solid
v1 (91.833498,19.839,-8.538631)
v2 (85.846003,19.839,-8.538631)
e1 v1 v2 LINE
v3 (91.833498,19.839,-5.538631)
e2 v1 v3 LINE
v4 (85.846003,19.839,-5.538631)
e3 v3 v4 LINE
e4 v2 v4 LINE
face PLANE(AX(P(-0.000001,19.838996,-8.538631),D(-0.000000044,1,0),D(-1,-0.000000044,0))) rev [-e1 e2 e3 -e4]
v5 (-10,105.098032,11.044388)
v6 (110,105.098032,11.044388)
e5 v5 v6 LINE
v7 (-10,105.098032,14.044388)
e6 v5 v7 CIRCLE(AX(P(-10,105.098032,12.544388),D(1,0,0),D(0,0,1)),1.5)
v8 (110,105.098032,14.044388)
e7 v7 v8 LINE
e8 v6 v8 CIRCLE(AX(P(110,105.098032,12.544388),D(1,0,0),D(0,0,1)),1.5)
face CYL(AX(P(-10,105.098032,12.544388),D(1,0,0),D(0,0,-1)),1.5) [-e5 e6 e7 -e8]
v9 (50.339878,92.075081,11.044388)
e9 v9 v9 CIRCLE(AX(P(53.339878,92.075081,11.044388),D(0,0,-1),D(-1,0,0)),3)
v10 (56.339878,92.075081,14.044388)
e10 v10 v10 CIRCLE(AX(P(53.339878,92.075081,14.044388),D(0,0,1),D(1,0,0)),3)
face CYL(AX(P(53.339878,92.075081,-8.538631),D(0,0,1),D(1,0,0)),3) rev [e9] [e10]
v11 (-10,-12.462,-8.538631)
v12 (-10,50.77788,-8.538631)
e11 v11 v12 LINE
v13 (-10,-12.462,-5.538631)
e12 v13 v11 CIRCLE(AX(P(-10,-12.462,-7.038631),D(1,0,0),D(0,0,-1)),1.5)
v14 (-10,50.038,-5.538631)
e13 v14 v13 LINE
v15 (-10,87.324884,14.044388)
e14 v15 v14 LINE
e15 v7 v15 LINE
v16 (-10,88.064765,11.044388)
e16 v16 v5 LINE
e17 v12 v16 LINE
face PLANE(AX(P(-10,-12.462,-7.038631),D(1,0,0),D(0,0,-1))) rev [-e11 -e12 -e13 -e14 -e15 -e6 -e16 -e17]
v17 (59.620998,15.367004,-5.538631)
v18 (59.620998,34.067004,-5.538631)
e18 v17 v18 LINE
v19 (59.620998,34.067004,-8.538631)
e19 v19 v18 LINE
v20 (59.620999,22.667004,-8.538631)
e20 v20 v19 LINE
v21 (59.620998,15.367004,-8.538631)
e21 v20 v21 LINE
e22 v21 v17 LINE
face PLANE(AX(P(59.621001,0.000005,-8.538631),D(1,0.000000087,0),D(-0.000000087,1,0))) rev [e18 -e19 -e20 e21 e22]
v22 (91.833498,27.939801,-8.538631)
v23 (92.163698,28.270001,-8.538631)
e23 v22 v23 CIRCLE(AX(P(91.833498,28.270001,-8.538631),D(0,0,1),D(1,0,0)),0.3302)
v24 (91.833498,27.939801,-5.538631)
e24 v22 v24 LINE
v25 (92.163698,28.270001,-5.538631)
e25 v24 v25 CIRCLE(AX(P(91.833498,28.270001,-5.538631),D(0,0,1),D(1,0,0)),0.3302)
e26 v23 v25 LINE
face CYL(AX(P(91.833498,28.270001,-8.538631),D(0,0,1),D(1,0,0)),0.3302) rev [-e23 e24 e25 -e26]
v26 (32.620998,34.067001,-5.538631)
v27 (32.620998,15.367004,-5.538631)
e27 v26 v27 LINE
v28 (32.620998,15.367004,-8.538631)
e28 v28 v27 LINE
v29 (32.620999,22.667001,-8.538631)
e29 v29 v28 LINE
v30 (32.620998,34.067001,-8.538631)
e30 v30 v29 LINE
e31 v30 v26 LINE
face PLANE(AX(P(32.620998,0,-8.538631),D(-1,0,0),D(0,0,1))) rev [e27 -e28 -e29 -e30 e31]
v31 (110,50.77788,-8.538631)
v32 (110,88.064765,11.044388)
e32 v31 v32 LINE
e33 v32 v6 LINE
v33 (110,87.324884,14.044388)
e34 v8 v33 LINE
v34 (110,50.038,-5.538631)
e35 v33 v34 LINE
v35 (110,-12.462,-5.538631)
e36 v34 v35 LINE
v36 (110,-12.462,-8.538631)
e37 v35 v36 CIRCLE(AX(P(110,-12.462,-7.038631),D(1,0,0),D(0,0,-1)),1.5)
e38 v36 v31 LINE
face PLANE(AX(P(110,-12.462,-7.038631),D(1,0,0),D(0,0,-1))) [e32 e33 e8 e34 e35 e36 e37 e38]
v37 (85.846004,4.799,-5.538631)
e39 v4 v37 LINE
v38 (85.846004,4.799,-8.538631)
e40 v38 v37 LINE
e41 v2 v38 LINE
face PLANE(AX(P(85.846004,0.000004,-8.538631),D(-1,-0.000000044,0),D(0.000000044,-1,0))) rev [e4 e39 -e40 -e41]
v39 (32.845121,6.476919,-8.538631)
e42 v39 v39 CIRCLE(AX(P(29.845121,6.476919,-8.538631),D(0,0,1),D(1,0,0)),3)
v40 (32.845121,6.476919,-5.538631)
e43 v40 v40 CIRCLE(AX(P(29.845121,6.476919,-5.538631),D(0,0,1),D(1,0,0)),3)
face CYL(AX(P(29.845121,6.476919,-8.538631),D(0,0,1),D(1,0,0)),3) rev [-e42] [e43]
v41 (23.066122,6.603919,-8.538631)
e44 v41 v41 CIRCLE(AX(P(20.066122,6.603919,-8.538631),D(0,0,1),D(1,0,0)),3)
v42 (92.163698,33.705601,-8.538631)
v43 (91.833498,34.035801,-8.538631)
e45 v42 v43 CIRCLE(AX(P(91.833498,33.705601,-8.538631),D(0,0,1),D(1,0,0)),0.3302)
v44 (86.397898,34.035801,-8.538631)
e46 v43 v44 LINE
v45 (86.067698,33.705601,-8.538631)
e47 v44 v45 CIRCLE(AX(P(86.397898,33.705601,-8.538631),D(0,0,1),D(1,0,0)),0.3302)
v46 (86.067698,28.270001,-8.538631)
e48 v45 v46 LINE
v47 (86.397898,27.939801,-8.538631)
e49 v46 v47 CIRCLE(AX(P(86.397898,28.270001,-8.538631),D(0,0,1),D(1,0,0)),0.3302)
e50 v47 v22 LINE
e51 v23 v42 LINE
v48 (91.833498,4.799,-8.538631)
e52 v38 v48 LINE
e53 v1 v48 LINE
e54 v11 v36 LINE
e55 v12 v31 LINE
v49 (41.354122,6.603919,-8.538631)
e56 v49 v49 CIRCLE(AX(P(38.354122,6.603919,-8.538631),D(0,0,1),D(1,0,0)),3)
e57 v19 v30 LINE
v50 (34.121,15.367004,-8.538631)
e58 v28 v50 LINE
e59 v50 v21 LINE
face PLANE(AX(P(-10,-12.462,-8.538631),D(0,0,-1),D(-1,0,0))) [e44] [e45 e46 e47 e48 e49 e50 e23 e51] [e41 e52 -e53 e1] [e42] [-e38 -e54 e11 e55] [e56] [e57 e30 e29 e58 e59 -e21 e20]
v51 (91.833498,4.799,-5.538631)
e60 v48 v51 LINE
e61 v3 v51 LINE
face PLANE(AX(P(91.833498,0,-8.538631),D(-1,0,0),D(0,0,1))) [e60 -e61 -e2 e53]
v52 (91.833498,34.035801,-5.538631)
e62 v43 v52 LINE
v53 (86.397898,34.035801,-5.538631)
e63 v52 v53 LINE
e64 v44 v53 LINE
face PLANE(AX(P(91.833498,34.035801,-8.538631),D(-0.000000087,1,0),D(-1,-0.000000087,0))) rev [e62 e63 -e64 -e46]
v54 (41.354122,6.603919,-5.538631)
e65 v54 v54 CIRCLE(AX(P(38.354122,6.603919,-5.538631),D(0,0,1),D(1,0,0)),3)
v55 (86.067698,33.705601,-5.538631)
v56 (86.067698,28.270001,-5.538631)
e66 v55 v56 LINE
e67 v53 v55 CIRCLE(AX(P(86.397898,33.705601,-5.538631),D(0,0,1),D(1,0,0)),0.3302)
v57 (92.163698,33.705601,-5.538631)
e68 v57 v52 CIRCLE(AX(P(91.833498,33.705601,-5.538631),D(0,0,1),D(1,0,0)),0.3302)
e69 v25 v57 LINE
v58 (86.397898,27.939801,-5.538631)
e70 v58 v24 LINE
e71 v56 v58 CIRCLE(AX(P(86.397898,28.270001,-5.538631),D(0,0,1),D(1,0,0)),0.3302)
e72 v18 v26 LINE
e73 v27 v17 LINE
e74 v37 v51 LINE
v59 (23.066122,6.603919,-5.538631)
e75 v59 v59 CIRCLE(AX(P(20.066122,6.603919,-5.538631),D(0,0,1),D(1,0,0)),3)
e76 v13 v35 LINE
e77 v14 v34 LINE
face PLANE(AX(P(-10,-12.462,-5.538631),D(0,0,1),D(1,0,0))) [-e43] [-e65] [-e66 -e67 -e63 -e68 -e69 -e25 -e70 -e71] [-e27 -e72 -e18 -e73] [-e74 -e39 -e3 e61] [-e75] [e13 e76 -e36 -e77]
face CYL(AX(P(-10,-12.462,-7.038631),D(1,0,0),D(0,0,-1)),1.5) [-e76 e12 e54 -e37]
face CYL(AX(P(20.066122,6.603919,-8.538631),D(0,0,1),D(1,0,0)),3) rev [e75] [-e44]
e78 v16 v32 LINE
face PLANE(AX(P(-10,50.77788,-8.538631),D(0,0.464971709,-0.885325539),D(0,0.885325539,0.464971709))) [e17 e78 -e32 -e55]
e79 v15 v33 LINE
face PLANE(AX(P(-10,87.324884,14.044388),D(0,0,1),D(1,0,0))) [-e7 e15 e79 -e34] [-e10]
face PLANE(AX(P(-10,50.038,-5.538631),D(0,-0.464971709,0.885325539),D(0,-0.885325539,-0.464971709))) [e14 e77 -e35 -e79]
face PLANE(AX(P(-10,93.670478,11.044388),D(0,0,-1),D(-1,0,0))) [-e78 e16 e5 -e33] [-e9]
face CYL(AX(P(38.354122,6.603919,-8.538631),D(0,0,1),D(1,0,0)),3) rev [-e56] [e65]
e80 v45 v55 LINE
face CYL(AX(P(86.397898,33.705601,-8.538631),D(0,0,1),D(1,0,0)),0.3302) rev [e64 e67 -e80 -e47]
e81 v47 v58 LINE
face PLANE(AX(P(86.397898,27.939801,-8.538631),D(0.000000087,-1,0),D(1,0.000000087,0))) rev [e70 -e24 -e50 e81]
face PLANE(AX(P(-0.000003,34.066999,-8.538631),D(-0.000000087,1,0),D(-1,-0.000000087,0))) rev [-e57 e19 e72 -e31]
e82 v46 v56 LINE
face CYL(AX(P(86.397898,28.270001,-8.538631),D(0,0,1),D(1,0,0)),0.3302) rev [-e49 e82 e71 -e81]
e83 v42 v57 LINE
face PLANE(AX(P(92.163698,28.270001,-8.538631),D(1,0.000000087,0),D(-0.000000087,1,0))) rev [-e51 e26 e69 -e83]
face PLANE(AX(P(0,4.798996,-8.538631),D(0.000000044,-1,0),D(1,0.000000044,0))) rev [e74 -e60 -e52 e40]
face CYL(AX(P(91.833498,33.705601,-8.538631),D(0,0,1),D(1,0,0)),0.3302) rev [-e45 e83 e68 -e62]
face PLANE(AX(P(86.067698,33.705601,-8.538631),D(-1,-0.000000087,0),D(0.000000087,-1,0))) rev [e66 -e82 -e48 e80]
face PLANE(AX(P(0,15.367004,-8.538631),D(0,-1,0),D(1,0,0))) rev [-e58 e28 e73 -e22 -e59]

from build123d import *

# Parameters (mm, degrees)
SALIENTE_EXTRUIR3_DEPTH      = 110
SALIENTE_EXTRUIR3_DEPTH_BACK = 10
CORTAR_EXTRUIR3_START        = -3
CORTAR_EXTRUIR3_OUTLINE_R    = 3
CORTAR_EXTRUIR3_DEPTH        = 22.583018394


# Read off the part's stored shape, not the designer's step: Cortar-Extruir3
with BuildPart() as part:
    # Croquis9 → Saliente-Extruir3 (new, two sides: drawn at the far end of the back side and taken through both)
    with BuildSketch(Plane(origin=(0, 0, 0), x_dir=(0, 0, -1), z_dir=(1, 0, 0)).offset(-SALIENTE_EXTRUIR3_DEPTH_BACK)):
        with BuildLine():
            Line((5.538630524, -12.462), (5.538630524, 50.038))
            Line((5.538630524, 50.038), (-14.04438787, 87.324884341))
            Line((-14.04438787, 87.324884341), (-14.04438787, 93.670477998))
            Line((-14.04438787, 93.670477998), (-14.04438787, 105.09803176))
            ThreePointArc((-14.04438787, 105.09803176), (-12.54438787, 106.59803176), (-11.04438787, 105.09803176))
            Line((-11.04438787, 105.09803176), (-11.04438787, 93.670477998))
            Line((-11.04438787, 93.670477998), (-11.04438787, 88.064764588))
            Line((-11.04438787, 88.064764588), (8.538630524, 50.777880247))
            Line((8.538630524, 50.777880247), (8.538630524, -12.462))
            ThreePointArc((8.538630524, -12.462), (7.038630524, -13.962), (5.538630524, -12.462))
        make_face()
    extrude(amount=SALIENTE_EXTRUIR3_DEPTH + SALIENTE_EXTRUIR3_DEPTH_BACK)

    # Cortar-Extruir3 outline → Cortar-Extruir3 (cut)
    with BuildSketch(Plane.XY.offset(-5.538630524).offset(CORTAR_EXTRUIR3_START)):
        Polygon((91.833498399, 4.799000122), (91.833498399, 19.839000383), (85.846003394, 19.839000122), (85.846004052, 4.799000122), align=None)
        with Locations((20.066122073, 6.603918538)):
            Circle(CORTAR_EXTRUIR3_OUTLINE_R)
        with Locations((29.845121402, 6.476918682)):
            Circle(CORTAR_EXTRUIR3_OUTLINE_R)
        Polygon((59.620998024, 34.067003823), (32.620998024, 34.067001462), (32.620998024, 15.367003823), (59.620998024, 15.367003823), align=None)
        with BuildLine():
            Line((92.16369837, 28.270001136), (92.163697895, 33.705601107))
            ThreePointArc((92.163697895, 33.705601107), (92.066984544, 33.939087777), (91.833497866, 34.035801107))
            Line((91.833497866, 34.035801107), (86.397897866, 34.035800632))
            ThreePointArc((86.397897866, 34.035800632), (86.164411215, 33.939087271), (86.067697895, 33.705600603))
            Line((86.067697895, 33.705600603), (86.06769837, 28.270000603))
            ThreePointArc((86.06769837, 28.270000603), (86.164411732, 28.036513952), (86.397898399, 27.939800632))
            Line((86.397898399, 27.939800632), (91.833498399, 27.939801107))
            ThreePointArc((91.833498399, 27.939801107), (92.066985049, 28.036514469), (92.16369837, 28.270001136))
        make_face()
        with Locations((38.35412218, 6.603918538)):
            Circle(CORTAR_EXTRUIR3_OUTLINE_R)
        with Locations((53.339878017, 92.075080872)):
            Circle(CORTAR_EXTRUIR3_OUTLINE_R)
    extrude(amount=CORTAR_EXTRUIR3_DEPTH, mode=Mode.SUBTRACT)


solid = part.part
